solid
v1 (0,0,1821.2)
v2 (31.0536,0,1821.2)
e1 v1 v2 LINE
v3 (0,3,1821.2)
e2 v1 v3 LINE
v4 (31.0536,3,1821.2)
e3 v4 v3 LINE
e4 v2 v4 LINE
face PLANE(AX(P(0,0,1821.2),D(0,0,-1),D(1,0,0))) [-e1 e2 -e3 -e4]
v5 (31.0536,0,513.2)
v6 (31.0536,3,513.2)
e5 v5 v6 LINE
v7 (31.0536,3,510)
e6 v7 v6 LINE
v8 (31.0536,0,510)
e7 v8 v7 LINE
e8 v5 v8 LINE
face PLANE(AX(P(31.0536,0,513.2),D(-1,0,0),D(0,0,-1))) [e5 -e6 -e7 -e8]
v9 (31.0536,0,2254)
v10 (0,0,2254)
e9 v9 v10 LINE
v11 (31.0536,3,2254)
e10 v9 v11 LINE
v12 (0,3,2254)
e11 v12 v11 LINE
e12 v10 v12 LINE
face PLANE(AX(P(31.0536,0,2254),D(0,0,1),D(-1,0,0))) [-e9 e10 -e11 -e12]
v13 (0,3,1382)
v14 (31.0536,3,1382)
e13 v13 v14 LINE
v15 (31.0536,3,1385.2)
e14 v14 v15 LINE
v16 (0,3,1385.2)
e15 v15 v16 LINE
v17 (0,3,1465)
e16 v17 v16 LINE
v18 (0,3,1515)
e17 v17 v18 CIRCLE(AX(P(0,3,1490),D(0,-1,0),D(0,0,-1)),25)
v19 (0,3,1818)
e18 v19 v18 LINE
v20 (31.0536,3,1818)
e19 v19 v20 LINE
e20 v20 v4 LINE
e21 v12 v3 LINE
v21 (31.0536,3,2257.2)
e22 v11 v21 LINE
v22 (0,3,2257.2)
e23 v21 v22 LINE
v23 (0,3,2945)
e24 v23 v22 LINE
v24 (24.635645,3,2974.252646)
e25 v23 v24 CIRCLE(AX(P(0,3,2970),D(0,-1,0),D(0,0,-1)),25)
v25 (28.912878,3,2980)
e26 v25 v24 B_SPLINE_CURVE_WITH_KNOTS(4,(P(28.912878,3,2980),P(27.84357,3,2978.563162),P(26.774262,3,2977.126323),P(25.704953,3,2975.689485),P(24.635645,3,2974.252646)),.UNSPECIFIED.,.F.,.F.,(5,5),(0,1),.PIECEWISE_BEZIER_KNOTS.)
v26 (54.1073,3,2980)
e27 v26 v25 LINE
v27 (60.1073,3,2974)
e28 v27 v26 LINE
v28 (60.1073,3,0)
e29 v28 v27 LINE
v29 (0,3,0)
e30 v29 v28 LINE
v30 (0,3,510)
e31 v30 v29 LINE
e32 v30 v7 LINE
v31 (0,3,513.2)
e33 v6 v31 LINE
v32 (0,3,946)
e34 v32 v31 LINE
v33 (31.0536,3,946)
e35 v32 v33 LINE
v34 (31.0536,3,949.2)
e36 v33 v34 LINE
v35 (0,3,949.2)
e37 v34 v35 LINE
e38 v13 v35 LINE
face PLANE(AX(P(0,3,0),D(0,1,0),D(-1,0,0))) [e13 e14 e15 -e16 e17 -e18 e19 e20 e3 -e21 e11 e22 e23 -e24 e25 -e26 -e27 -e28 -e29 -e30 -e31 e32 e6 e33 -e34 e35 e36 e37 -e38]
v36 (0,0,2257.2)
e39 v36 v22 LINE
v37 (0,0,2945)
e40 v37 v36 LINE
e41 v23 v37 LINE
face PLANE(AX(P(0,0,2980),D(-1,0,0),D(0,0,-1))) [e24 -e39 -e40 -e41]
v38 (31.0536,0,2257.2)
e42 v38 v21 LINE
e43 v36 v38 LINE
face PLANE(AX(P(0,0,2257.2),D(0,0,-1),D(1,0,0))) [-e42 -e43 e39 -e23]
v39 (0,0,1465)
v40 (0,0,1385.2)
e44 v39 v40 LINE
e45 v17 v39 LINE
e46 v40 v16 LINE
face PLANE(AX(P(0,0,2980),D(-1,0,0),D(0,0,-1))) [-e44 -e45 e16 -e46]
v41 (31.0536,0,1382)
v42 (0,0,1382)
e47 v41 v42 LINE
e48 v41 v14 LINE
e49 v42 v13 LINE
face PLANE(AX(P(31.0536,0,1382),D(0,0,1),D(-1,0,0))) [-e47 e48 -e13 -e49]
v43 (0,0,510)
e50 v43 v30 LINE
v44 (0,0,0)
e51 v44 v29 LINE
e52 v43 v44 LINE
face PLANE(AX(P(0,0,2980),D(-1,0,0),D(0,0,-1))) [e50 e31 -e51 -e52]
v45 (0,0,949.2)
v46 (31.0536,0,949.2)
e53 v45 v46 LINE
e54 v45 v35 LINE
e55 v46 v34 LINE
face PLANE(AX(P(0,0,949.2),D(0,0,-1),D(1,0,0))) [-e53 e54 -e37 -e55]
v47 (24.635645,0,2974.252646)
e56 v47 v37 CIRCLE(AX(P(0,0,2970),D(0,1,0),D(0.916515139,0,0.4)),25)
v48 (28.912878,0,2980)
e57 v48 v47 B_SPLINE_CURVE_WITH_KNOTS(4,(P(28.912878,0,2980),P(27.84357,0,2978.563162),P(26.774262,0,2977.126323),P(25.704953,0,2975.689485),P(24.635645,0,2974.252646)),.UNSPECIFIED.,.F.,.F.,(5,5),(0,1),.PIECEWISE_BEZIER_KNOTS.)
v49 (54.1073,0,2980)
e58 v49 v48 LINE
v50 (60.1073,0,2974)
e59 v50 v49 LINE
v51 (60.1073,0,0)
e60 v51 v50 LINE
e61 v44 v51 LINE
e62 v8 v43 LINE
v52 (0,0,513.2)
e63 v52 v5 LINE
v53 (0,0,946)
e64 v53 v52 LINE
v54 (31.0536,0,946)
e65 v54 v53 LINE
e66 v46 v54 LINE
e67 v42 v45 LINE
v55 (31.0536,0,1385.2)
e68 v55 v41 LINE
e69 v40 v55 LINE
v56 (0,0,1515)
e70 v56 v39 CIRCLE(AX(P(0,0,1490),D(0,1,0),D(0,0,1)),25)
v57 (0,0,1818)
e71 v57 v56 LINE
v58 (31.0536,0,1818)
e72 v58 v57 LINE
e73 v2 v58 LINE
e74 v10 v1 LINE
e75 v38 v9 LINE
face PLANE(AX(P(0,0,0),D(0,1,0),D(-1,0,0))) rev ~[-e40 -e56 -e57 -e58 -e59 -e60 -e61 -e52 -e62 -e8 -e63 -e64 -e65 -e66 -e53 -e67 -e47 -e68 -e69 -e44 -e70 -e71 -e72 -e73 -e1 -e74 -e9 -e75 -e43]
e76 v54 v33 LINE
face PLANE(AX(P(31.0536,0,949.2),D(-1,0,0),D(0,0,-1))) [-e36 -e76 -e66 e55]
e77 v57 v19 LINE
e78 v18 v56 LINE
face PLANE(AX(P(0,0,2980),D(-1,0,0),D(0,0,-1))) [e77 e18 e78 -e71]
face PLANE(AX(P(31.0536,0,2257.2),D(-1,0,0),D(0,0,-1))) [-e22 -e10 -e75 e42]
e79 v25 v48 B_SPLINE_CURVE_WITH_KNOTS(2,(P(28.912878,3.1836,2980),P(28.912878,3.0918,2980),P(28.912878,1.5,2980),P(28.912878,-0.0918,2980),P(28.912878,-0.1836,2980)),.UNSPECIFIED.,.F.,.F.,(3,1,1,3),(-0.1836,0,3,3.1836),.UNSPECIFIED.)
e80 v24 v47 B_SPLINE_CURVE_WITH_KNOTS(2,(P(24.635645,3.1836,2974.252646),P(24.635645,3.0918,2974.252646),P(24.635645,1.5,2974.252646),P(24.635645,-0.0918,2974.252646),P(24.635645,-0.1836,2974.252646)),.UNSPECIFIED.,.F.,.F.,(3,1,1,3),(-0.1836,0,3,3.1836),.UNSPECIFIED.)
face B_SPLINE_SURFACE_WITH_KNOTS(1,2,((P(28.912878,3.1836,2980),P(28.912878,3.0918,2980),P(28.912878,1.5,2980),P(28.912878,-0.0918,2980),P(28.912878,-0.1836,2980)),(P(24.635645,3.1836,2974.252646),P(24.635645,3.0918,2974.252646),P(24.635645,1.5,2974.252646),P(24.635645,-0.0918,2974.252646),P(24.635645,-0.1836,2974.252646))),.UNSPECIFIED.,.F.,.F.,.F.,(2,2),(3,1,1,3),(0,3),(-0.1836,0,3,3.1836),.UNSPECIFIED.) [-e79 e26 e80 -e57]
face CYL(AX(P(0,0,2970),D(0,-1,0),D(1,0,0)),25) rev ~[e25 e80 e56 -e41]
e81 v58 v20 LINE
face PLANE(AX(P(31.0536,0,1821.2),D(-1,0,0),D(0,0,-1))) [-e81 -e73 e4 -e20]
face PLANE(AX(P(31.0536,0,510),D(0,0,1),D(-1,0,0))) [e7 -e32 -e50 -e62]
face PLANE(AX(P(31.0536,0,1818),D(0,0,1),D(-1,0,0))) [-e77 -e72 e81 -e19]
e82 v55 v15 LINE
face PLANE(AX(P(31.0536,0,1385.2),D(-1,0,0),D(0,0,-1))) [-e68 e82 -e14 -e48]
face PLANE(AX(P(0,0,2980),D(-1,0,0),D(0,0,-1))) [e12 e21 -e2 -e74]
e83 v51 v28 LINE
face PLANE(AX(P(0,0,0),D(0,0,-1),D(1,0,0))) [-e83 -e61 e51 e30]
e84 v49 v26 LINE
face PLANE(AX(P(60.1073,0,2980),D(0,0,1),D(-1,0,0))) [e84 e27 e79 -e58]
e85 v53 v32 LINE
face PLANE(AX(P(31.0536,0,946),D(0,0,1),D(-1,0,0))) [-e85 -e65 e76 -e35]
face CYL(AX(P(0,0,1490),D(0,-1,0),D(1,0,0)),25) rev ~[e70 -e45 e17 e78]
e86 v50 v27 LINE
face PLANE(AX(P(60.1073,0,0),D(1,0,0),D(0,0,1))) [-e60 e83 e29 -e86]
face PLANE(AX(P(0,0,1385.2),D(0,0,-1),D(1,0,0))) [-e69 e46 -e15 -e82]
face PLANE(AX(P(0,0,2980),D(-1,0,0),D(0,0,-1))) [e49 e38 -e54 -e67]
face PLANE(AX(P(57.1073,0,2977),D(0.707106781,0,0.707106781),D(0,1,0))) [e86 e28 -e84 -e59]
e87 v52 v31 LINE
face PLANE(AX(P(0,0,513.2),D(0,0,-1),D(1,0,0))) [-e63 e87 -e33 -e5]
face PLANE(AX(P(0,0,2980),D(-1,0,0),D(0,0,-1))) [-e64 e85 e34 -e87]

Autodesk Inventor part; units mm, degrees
ref_plane "YZ Plane" through (0, 0, 0) normal (1, 0, 0) x (0, 1, 0)
ref_plane "XZ Plane" through (0, 0, 0) normal (0, 1, 0) x (-1, 0, 0)
ref_plane "XY Plane" through (0, 0, 0) normal (0, 0, 1) x (1, 0, 0)
sketch "Sketch6" plane through (0, 0, 0) normal (0, 1, 0) x (-1, 0, 0)
  line L0 (0, 0) -> (-60.1073, 0)
  line L1 (-60.1073, 0) -> (-60.1073, 2980)
  line L2 (-60.1073, 2980) -> (0, 2980)
  line L3 (0, 2980) -> (0, 0)
  dimension "d26" = 60.1073
  dimension "d27" = 2980
extrude "Plate4" add sketch "Sketch6" along normal blind 3
sketch "Sketch9" plane through (0, 3, 0) normal (0, 1, 0) x (1, 0, 0)
  line L0 (0, -2980) -> (0, 0) projected
  line L1 (60.1073, -2980) -> (0, -2980) projected
  line L2 (60.1073, 0) -> (60.1073, -2980) projected
  line L3 (0, 0) -> (60.1073, 0) projected
  line L4 (25, -210) -> (10, -210) construction
  line L5 (10, -210) -> (10, -10) construction
  line L6 (10, -10) -> (25, -10) construction
  line L7 (25, -10) -> (25, -210) construction
  dimension "d44" = 200
  dimension "d45" = 15
  dimension "d46" = 10
  dimension "d47" = 10
mark "Mark1"
sketch "Sketch7" plane through (0, 0, 0) normal (0, -1, 0) x (1, 0, 0)
  line L0 (0, 2980) -> (60.1073, 2980) projected
  line L1 (0, 0) -> (0, 2980) projected
  line L2 (60.1073, 0) -> (0, 0) projected
  line L3 (60.1073, 2980) -> (60.1073, 0) projected
  line L4 (0, 513.2) -> (31.0536, 513.2)
  line L5 (31.0536, 513.2) -> (31.0536, 510)
  line L6 (31.0536, 510) -> (0, 510)
  line L7 (0, 510) -> (0, 513.2)
  point P0 (0, 510)
  point P1 (0, 200)
  point P2 (46.4173, 200)
  point P3 (0, 510)
  dimension "d29" = 31.0536
  dimension "d30" = 3.2
  dimension "d31" = 510
extrude "Extrusion2" cut sketch "Sketch7" against normal through all contours L4 L5 L6 L1
pattern_linear "Rectangular Pattern1" count 5 spacing 436 along (0, 0, 1) of "Extrusion2"
sketch "Sketch8" plane through (0, 0, 0) normal (0, -1, 0) x (1, 0, 0)
  line L0 (0, 1821.2) -> (0, 2254) projected
  line L1 (0, 513.2) -> (31.0536, 513.2) projected
  line L2 (31.0536, 513.2) -> (31.0536, 510) projected
  line L3 (31.0536, 510) -> (0, 510) projected
  line L4 (0, 0) -> (0, 510) projected
  line L5 (60.1073, 0) -> (0, 0) projected
  line L6 (60.1073, 2980) -> (60.1073, 0) projected
  line L7 (0, 2980) -> (60.1073, 2980) projected
  circle A0 centre (0, 1490) radius 25
  line L8 (0, 1821.2) -> (31.0536, 1821.2) projected
  line L9 (31.0536, 1821.2) -> (31.0536, 1818) projected
  line L10 (31.0536, 1818) -> (0, 1818) projected
  line L11 (0, 1385.2) -> (0, 1818) projected
  line L12 (0, 1385.2) -> (31.0536, 1385.2) projected
  line L13 (31.0536, 1385.2) -> (31.0536, 1382) projected
  line L14 (31.0536, 1382) -> (0, 1382) projected
  line L15 (0, 949.2) -> (0, 1382) projected
  line L16 (0, 949.2) -> (31.0536, 949.2) projected
  line L17 (31.0536, 949.2) -> (31.0536, 946) projected
  line L18 (31.0536, 946) -> (0, 946) projected
  line L19 (0, 513.2) -> (0, 946) projected
  line L20 (0, 2257.2) -> (31.0536, 2257.2) projected
  line L21 (31.0536, 2257.2) -> (31.0536, 2254) projected
  line L22 (31.0536, 2254) -> (0, 2254) projected
  line L23 (0, 2257.2) -> (0, 2980) projected
  dimension "d37" = 50
  dimension "d38" = 1490
extrude "Extrusion3" cut sketch "Sketch8" against normal through all contours L11 A0 | A0 L11
pattern_linear "Rectangular Pattern2" count 2 spacing 1480 along (0, 0, 1) of "Extrusion3"
chamfer "Corner Chamfer1" distance 6 angle 45 2 edges at (22.9129, 1.5, 2980) (60.1073, 1.5, 2980)
equation "\"d26\" = Stringer4_deep"
equation "\"d28\" = Thickness"
equation "\"BendReliefWidth\" = Thickness"
equation "\"BendReliefDepth\" = 0.5 * Thickness"
equation "\"CornerReliefSize\" = 4 * Thickness"
equation "\"MinimumRemnant\" = 2 * Thickness"
equation "\"TransitionRadius\" = BendRadius"
equation "\"JacobiRadiusSize\" = BendRadius"
equation "\"GapSize\" = Thickness"
equation "\"Stringer4_deep\" = 60.107271"
equation "\"Thickness\" = 3"
equation "\"BendRadius\" = 5"
properties part number "BSH 044 stringer 4" material "09g2s"
